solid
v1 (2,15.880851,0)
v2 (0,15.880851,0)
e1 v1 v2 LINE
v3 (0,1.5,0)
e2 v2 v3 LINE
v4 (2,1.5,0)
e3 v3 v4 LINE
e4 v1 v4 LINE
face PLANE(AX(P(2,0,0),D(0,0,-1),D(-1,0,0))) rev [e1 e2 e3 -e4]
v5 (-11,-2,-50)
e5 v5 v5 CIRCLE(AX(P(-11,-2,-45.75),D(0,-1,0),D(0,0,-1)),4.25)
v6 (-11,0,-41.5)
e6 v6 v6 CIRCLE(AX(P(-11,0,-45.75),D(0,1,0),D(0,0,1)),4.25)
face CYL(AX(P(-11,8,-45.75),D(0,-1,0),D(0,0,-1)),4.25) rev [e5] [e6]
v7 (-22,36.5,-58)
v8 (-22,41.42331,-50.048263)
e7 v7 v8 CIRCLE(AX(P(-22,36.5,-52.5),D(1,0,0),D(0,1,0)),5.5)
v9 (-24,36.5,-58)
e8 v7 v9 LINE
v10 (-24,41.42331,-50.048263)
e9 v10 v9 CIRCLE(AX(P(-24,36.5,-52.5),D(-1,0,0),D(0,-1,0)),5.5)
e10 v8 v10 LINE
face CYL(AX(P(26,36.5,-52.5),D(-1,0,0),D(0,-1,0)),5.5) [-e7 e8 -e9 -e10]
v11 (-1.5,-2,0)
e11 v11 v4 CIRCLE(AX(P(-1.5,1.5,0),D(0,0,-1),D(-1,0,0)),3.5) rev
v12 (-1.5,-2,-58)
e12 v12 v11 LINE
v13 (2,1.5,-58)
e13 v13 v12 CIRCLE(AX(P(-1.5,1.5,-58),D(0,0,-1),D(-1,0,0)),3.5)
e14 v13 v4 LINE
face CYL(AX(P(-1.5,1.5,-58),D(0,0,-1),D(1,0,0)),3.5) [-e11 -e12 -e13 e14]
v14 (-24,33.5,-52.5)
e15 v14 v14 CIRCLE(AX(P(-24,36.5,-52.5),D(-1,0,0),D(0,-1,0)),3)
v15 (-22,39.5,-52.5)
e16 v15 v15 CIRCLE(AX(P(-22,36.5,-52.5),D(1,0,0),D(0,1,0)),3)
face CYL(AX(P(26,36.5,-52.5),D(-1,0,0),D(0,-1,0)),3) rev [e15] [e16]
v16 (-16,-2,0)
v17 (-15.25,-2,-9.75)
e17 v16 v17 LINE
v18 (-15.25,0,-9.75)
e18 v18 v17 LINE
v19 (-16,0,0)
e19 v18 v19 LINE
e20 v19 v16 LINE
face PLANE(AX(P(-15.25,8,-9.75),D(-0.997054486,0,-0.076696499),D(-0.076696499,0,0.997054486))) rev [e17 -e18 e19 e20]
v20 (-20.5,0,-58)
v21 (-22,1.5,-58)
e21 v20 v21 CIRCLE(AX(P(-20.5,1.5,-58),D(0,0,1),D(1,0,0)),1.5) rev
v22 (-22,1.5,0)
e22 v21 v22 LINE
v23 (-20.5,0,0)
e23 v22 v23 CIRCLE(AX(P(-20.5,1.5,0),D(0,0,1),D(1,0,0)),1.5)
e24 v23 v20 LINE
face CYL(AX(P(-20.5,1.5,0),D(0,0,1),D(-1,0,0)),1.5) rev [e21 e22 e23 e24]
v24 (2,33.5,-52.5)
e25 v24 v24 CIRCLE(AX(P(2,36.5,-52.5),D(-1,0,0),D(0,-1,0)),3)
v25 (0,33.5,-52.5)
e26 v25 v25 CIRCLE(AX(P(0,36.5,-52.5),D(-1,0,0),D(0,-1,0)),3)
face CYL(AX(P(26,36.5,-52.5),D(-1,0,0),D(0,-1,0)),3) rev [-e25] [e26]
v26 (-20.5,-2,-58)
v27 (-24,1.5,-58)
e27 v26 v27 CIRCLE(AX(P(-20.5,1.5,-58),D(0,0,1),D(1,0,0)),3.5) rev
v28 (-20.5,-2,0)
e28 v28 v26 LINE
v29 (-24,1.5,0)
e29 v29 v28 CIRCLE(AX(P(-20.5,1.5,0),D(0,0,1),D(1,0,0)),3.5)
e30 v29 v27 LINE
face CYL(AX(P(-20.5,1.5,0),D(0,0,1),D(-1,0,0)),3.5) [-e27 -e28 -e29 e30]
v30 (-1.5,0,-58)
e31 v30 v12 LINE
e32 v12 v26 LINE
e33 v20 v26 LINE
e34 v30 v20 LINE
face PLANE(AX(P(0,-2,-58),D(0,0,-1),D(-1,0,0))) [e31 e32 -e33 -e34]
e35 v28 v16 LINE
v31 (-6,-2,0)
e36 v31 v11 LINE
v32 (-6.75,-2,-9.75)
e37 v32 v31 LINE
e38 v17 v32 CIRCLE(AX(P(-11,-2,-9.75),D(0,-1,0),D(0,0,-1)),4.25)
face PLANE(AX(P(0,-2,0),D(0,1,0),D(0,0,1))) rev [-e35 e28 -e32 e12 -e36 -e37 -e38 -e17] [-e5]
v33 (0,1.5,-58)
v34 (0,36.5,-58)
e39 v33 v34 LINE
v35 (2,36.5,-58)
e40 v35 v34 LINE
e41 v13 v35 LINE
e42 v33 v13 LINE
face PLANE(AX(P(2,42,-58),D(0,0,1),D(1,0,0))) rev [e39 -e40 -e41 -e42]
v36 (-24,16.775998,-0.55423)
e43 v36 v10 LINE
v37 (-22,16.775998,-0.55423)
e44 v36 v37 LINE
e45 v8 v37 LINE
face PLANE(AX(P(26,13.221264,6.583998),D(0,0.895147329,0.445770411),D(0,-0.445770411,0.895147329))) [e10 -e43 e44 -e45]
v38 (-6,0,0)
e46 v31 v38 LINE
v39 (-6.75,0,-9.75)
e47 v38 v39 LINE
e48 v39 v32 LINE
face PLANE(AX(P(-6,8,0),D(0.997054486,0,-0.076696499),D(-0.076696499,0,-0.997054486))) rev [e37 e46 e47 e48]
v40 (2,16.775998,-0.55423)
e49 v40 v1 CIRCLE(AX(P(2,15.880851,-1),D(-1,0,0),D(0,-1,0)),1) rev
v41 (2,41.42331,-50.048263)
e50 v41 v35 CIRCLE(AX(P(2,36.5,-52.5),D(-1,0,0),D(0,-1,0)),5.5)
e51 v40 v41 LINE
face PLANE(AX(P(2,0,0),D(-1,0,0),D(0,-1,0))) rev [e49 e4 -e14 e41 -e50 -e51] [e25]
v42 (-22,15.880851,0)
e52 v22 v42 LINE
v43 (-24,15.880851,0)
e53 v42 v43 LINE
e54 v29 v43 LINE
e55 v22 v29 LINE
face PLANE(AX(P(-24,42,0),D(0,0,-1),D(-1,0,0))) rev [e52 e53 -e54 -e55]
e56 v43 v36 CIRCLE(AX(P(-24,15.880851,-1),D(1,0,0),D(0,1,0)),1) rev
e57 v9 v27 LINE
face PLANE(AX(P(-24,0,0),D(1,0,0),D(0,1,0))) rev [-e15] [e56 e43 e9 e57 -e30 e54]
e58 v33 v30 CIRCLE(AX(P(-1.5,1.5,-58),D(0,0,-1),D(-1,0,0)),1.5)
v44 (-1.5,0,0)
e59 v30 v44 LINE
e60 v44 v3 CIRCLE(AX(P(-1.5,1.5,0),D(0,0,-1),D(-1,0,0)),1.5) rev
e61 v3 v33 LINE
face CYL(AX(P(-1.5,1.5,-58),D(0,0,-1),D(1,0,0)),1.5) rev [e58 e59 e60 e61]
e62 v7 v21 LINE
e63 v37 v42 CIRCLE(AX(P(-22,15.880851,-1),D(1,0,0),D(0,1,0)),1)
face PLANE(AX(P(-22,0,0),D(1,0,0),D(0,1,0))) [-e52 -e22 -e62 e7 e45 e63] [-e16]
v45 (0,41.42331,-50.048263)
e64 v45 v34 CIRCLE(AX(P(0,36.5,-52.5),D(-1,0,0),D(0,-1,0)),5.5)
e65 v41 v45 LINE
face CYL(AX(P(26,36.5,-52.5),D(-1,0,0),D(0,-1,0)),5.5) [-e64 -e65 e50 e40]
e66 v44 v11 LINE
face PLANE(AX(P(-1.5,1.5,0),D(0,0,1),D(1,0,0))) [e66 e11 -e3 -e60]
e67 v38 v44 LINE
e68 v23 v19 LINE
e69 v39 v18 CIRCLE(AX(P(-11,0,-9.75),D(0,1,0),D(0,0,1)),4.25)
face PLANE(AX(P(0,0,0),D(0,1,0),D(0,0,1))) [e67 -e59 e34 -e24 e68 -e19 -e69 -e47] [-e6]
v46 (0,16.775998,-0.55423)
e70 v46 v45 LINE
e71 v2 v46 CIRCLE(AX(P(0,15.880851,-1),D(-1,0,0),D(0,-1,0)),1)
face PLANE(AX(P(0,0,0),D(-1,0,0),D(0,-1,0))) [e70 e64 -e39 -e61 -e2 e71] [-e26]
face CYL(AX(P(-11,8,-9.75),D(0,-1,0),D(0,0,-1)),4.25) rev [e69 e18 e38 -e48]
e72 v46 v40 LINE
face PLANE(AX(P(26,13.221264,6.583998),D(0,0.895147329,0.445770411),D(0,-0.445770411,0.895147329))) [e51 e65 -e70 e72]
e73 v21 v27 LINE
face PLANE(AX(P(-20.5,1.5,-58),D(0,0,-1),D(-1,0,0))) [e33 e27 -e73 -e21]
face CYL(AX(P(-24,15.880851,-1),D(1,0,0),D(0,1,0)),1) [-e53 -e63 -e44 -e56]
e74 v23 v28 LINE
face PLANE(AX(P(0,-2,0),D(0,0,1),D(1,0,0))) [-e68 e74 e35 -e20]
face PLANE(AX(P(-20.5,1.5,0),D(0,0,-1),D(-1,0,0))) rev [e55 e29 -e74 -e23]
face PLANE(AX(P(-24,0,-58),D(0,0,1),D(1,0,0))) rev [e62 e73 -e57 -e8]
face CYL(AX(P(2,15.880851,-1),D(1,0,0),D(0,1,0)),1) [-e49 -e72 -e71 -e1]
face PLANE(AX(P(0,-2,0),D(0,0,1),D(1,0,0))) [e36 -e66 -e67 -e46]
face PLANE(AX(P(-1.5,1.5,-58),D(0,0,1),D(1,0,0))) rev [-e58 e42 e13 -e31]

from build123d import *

# Parameters (mm, degrees)
BASE_FLANGIA1_DEPTH            = 2
BORDO_FLANGIA1_STRIP_W         = 11
BORDO_FLANGIA1_STRIP_H         = 2
BORDO_FLANGIA1_STRIP_CUT_DEPTH = 58
BORDO_FLANGIA1_DEPTH           = 58
BORDO_FLANGIA2_STRIP_W         = 11
BORDO_FLANGIA2_STRIP_H         = 2
BORDO_FLANGIA2_STRIP_CUT_DEPTH = 58
BORDO_FLANGIA2_DEPTH           = 58
SCHIZZO11_R                    = 3
TAGLIO_ESTRUSIONE1_DEPTH       = 50
RACCORDO2_R                    = 1
SCHIZZO16_R                    = 4.25
TAGLIO_ESTRUSIONE2_DEPTH       = 10


# Sheet-metal steps are written as plain solids
with BuildPart() as part:
    # Schizzo1 → Base-Flangia1 (new body)
    with BuildSketch(Plane(origin=(0, 0, 0), x_dir=(1, 0, 0), z_dir=(0, 1, 0))):
        Polygon((0, 0), (-6, 0), (-16, 0), (-22, 0), (-22, 58), (0, 58), align=None)
    extrude(amount=-BASE_FLANGIA1_DEPTH)

    # Bordo-Flangia1 strip (across the edge) → Bordo-Flangia1 strip cut (cut)
    with BuildSketch(Plane(origin=(-22, 0, -58), x_dir=(1, 0, 0), z_dir=(0, 0, 1))):
        with Locations((-4, -1)):
            Rectangle(BORDO_FLANGIA1_STRIP_W, BORDO_FLANGIA1_STRIP_H)
    extrude(amount=BORDO_FLANGIA1_STRIP_CUT_DEPTH, mode=Mode.SUBTRACT)

    # Bordo-Flangia1 section (across the edge) → Bordo-Flangia1 (add)
    with BuildSketch(Plane(origin=(-22, 0, -58), x_dir=(1, 0, 0), z_dir=(0, 0, 1))):
        with BuildLine():
            Line((-2, 1.5), (-2, 42))
            Line((-2, 42), (0, 42))
            Line((0, 42), (0, 1.5))
            ThreePointArc((0, 1.5), (0.439339828, 0.439339828), (1.5, 0))
            Line((1.5, 0), (1.5, -2))
            ThreePointArc((1.5, -2), (-0.974873734, -0.974873734), (-2, 1.5))
        make_face()
    extrude(amount=BORDO_FLANGIA1_DEPTH)

    # Bordo-Flangia2 strip (across the edge) → Bordo-Flangia2 strip cut (cut)
    with BuildSketch(Plane(origin=(0, 0, 0), x_dir=(-1, 0, 0), z_dir=(0, 0, -1))):
        with Locations((-4, -1)):
            Rectangle(BORDO_FLANGIA2_STRIP_W, BORDO_FLANGIA2_STRIP_H)
    extrude(amount=BORDO_FLANGIA2_STRIP_CUT_DEPTH, mode=Mode.SUBTRACT)

    # Bordo-Flangia2 section (across the edge) → Bordo-Flangia2 (add)
    with BuildSketch(Plane(origin=(0, 0, 0), x_dir=(-1, 0, 0), z_dir=(0, 0, -1))):
        with BuildLine():
            Line((-2, 1.5), (-2, 42))
            Line((-2, 42), (0, 42))
            Line((0, 42), (0, 1.5))
            ThreePointArc((0, 1.5), (0.439339828, 0.439339828), (1.5, 0))
            Line((1.5, 0), (1.5, -2))
            ThreePointArc((1.5, -2), (-0.974873734, -0.974873734), (-2, 1.5))
        make_face()
    extrude(amount=BORDO_FLANGIA2_DEPTH)

    # Schizzo11 → Taglio-Estrusione1 (cut)
    with BuildSketch(Plane.ZY.offset(24)):
        with BuildLine():
            Line((-58, 42), (-58, 36.5))
            ThreePointArc((-58, 36.5), (-56.389087297, 40.389087297), (-52.5, 42))
            Line((-52.5, 42), (-58, 42))
        make_face()
        with BuildLine():
            Line((-50.048262739, 41.42331031), (0, 16.5))
            Line((0, 16.5), (0, 42))
            Line((0, 42), (-52.5, 42))
            ThreePointArc((-52.5, 42), (-51.240676114, 41.853886752), (-50.048262739, 41.42331031))
        make_face()
        with Locations(Location((-52.5, 36.5, 0), (0, 0, 270))):
            Circle(SCHIZZO11_R)
    extrude(amount=-TAGLIO_ESTRUSIONE1_DEPTH, mode=Mode.SUBTRACT)

    # Raccordo2
    raccordo2_edges = [part.edges().sort_by_distance(p)[0] for p in [
        (1, 16.5, 0),
        (-23, 16.5, 0),
    ]]
    fillet(raccordo2_edges, radius=RACCORDO2_R)

    # Schizzo16 → Taglio-Estrusione2 (cut)
    with BuildSketch(Plane.XZ.offset(2)):
        with Locations(Location((-11, -45.75, 0), (0, 0, 270))):
            Circle(SCHIZZO16_R)
        with BuildLine():
            Line((-15.25, -9.75), (-16, 0))
            Line((-16, 0), (-6, 0))
            Line((-6, 0), (-6.75, -9.75))
            ThreePointArc((-6.75, -9.75), (-11, -14), (-15.25, -9.75))
        make_face()
    extrude(amount=-TAGLIO_ESTRUSIONE2_DEPTH, mode=Mode.SUBTRACT)


solid = part.part
